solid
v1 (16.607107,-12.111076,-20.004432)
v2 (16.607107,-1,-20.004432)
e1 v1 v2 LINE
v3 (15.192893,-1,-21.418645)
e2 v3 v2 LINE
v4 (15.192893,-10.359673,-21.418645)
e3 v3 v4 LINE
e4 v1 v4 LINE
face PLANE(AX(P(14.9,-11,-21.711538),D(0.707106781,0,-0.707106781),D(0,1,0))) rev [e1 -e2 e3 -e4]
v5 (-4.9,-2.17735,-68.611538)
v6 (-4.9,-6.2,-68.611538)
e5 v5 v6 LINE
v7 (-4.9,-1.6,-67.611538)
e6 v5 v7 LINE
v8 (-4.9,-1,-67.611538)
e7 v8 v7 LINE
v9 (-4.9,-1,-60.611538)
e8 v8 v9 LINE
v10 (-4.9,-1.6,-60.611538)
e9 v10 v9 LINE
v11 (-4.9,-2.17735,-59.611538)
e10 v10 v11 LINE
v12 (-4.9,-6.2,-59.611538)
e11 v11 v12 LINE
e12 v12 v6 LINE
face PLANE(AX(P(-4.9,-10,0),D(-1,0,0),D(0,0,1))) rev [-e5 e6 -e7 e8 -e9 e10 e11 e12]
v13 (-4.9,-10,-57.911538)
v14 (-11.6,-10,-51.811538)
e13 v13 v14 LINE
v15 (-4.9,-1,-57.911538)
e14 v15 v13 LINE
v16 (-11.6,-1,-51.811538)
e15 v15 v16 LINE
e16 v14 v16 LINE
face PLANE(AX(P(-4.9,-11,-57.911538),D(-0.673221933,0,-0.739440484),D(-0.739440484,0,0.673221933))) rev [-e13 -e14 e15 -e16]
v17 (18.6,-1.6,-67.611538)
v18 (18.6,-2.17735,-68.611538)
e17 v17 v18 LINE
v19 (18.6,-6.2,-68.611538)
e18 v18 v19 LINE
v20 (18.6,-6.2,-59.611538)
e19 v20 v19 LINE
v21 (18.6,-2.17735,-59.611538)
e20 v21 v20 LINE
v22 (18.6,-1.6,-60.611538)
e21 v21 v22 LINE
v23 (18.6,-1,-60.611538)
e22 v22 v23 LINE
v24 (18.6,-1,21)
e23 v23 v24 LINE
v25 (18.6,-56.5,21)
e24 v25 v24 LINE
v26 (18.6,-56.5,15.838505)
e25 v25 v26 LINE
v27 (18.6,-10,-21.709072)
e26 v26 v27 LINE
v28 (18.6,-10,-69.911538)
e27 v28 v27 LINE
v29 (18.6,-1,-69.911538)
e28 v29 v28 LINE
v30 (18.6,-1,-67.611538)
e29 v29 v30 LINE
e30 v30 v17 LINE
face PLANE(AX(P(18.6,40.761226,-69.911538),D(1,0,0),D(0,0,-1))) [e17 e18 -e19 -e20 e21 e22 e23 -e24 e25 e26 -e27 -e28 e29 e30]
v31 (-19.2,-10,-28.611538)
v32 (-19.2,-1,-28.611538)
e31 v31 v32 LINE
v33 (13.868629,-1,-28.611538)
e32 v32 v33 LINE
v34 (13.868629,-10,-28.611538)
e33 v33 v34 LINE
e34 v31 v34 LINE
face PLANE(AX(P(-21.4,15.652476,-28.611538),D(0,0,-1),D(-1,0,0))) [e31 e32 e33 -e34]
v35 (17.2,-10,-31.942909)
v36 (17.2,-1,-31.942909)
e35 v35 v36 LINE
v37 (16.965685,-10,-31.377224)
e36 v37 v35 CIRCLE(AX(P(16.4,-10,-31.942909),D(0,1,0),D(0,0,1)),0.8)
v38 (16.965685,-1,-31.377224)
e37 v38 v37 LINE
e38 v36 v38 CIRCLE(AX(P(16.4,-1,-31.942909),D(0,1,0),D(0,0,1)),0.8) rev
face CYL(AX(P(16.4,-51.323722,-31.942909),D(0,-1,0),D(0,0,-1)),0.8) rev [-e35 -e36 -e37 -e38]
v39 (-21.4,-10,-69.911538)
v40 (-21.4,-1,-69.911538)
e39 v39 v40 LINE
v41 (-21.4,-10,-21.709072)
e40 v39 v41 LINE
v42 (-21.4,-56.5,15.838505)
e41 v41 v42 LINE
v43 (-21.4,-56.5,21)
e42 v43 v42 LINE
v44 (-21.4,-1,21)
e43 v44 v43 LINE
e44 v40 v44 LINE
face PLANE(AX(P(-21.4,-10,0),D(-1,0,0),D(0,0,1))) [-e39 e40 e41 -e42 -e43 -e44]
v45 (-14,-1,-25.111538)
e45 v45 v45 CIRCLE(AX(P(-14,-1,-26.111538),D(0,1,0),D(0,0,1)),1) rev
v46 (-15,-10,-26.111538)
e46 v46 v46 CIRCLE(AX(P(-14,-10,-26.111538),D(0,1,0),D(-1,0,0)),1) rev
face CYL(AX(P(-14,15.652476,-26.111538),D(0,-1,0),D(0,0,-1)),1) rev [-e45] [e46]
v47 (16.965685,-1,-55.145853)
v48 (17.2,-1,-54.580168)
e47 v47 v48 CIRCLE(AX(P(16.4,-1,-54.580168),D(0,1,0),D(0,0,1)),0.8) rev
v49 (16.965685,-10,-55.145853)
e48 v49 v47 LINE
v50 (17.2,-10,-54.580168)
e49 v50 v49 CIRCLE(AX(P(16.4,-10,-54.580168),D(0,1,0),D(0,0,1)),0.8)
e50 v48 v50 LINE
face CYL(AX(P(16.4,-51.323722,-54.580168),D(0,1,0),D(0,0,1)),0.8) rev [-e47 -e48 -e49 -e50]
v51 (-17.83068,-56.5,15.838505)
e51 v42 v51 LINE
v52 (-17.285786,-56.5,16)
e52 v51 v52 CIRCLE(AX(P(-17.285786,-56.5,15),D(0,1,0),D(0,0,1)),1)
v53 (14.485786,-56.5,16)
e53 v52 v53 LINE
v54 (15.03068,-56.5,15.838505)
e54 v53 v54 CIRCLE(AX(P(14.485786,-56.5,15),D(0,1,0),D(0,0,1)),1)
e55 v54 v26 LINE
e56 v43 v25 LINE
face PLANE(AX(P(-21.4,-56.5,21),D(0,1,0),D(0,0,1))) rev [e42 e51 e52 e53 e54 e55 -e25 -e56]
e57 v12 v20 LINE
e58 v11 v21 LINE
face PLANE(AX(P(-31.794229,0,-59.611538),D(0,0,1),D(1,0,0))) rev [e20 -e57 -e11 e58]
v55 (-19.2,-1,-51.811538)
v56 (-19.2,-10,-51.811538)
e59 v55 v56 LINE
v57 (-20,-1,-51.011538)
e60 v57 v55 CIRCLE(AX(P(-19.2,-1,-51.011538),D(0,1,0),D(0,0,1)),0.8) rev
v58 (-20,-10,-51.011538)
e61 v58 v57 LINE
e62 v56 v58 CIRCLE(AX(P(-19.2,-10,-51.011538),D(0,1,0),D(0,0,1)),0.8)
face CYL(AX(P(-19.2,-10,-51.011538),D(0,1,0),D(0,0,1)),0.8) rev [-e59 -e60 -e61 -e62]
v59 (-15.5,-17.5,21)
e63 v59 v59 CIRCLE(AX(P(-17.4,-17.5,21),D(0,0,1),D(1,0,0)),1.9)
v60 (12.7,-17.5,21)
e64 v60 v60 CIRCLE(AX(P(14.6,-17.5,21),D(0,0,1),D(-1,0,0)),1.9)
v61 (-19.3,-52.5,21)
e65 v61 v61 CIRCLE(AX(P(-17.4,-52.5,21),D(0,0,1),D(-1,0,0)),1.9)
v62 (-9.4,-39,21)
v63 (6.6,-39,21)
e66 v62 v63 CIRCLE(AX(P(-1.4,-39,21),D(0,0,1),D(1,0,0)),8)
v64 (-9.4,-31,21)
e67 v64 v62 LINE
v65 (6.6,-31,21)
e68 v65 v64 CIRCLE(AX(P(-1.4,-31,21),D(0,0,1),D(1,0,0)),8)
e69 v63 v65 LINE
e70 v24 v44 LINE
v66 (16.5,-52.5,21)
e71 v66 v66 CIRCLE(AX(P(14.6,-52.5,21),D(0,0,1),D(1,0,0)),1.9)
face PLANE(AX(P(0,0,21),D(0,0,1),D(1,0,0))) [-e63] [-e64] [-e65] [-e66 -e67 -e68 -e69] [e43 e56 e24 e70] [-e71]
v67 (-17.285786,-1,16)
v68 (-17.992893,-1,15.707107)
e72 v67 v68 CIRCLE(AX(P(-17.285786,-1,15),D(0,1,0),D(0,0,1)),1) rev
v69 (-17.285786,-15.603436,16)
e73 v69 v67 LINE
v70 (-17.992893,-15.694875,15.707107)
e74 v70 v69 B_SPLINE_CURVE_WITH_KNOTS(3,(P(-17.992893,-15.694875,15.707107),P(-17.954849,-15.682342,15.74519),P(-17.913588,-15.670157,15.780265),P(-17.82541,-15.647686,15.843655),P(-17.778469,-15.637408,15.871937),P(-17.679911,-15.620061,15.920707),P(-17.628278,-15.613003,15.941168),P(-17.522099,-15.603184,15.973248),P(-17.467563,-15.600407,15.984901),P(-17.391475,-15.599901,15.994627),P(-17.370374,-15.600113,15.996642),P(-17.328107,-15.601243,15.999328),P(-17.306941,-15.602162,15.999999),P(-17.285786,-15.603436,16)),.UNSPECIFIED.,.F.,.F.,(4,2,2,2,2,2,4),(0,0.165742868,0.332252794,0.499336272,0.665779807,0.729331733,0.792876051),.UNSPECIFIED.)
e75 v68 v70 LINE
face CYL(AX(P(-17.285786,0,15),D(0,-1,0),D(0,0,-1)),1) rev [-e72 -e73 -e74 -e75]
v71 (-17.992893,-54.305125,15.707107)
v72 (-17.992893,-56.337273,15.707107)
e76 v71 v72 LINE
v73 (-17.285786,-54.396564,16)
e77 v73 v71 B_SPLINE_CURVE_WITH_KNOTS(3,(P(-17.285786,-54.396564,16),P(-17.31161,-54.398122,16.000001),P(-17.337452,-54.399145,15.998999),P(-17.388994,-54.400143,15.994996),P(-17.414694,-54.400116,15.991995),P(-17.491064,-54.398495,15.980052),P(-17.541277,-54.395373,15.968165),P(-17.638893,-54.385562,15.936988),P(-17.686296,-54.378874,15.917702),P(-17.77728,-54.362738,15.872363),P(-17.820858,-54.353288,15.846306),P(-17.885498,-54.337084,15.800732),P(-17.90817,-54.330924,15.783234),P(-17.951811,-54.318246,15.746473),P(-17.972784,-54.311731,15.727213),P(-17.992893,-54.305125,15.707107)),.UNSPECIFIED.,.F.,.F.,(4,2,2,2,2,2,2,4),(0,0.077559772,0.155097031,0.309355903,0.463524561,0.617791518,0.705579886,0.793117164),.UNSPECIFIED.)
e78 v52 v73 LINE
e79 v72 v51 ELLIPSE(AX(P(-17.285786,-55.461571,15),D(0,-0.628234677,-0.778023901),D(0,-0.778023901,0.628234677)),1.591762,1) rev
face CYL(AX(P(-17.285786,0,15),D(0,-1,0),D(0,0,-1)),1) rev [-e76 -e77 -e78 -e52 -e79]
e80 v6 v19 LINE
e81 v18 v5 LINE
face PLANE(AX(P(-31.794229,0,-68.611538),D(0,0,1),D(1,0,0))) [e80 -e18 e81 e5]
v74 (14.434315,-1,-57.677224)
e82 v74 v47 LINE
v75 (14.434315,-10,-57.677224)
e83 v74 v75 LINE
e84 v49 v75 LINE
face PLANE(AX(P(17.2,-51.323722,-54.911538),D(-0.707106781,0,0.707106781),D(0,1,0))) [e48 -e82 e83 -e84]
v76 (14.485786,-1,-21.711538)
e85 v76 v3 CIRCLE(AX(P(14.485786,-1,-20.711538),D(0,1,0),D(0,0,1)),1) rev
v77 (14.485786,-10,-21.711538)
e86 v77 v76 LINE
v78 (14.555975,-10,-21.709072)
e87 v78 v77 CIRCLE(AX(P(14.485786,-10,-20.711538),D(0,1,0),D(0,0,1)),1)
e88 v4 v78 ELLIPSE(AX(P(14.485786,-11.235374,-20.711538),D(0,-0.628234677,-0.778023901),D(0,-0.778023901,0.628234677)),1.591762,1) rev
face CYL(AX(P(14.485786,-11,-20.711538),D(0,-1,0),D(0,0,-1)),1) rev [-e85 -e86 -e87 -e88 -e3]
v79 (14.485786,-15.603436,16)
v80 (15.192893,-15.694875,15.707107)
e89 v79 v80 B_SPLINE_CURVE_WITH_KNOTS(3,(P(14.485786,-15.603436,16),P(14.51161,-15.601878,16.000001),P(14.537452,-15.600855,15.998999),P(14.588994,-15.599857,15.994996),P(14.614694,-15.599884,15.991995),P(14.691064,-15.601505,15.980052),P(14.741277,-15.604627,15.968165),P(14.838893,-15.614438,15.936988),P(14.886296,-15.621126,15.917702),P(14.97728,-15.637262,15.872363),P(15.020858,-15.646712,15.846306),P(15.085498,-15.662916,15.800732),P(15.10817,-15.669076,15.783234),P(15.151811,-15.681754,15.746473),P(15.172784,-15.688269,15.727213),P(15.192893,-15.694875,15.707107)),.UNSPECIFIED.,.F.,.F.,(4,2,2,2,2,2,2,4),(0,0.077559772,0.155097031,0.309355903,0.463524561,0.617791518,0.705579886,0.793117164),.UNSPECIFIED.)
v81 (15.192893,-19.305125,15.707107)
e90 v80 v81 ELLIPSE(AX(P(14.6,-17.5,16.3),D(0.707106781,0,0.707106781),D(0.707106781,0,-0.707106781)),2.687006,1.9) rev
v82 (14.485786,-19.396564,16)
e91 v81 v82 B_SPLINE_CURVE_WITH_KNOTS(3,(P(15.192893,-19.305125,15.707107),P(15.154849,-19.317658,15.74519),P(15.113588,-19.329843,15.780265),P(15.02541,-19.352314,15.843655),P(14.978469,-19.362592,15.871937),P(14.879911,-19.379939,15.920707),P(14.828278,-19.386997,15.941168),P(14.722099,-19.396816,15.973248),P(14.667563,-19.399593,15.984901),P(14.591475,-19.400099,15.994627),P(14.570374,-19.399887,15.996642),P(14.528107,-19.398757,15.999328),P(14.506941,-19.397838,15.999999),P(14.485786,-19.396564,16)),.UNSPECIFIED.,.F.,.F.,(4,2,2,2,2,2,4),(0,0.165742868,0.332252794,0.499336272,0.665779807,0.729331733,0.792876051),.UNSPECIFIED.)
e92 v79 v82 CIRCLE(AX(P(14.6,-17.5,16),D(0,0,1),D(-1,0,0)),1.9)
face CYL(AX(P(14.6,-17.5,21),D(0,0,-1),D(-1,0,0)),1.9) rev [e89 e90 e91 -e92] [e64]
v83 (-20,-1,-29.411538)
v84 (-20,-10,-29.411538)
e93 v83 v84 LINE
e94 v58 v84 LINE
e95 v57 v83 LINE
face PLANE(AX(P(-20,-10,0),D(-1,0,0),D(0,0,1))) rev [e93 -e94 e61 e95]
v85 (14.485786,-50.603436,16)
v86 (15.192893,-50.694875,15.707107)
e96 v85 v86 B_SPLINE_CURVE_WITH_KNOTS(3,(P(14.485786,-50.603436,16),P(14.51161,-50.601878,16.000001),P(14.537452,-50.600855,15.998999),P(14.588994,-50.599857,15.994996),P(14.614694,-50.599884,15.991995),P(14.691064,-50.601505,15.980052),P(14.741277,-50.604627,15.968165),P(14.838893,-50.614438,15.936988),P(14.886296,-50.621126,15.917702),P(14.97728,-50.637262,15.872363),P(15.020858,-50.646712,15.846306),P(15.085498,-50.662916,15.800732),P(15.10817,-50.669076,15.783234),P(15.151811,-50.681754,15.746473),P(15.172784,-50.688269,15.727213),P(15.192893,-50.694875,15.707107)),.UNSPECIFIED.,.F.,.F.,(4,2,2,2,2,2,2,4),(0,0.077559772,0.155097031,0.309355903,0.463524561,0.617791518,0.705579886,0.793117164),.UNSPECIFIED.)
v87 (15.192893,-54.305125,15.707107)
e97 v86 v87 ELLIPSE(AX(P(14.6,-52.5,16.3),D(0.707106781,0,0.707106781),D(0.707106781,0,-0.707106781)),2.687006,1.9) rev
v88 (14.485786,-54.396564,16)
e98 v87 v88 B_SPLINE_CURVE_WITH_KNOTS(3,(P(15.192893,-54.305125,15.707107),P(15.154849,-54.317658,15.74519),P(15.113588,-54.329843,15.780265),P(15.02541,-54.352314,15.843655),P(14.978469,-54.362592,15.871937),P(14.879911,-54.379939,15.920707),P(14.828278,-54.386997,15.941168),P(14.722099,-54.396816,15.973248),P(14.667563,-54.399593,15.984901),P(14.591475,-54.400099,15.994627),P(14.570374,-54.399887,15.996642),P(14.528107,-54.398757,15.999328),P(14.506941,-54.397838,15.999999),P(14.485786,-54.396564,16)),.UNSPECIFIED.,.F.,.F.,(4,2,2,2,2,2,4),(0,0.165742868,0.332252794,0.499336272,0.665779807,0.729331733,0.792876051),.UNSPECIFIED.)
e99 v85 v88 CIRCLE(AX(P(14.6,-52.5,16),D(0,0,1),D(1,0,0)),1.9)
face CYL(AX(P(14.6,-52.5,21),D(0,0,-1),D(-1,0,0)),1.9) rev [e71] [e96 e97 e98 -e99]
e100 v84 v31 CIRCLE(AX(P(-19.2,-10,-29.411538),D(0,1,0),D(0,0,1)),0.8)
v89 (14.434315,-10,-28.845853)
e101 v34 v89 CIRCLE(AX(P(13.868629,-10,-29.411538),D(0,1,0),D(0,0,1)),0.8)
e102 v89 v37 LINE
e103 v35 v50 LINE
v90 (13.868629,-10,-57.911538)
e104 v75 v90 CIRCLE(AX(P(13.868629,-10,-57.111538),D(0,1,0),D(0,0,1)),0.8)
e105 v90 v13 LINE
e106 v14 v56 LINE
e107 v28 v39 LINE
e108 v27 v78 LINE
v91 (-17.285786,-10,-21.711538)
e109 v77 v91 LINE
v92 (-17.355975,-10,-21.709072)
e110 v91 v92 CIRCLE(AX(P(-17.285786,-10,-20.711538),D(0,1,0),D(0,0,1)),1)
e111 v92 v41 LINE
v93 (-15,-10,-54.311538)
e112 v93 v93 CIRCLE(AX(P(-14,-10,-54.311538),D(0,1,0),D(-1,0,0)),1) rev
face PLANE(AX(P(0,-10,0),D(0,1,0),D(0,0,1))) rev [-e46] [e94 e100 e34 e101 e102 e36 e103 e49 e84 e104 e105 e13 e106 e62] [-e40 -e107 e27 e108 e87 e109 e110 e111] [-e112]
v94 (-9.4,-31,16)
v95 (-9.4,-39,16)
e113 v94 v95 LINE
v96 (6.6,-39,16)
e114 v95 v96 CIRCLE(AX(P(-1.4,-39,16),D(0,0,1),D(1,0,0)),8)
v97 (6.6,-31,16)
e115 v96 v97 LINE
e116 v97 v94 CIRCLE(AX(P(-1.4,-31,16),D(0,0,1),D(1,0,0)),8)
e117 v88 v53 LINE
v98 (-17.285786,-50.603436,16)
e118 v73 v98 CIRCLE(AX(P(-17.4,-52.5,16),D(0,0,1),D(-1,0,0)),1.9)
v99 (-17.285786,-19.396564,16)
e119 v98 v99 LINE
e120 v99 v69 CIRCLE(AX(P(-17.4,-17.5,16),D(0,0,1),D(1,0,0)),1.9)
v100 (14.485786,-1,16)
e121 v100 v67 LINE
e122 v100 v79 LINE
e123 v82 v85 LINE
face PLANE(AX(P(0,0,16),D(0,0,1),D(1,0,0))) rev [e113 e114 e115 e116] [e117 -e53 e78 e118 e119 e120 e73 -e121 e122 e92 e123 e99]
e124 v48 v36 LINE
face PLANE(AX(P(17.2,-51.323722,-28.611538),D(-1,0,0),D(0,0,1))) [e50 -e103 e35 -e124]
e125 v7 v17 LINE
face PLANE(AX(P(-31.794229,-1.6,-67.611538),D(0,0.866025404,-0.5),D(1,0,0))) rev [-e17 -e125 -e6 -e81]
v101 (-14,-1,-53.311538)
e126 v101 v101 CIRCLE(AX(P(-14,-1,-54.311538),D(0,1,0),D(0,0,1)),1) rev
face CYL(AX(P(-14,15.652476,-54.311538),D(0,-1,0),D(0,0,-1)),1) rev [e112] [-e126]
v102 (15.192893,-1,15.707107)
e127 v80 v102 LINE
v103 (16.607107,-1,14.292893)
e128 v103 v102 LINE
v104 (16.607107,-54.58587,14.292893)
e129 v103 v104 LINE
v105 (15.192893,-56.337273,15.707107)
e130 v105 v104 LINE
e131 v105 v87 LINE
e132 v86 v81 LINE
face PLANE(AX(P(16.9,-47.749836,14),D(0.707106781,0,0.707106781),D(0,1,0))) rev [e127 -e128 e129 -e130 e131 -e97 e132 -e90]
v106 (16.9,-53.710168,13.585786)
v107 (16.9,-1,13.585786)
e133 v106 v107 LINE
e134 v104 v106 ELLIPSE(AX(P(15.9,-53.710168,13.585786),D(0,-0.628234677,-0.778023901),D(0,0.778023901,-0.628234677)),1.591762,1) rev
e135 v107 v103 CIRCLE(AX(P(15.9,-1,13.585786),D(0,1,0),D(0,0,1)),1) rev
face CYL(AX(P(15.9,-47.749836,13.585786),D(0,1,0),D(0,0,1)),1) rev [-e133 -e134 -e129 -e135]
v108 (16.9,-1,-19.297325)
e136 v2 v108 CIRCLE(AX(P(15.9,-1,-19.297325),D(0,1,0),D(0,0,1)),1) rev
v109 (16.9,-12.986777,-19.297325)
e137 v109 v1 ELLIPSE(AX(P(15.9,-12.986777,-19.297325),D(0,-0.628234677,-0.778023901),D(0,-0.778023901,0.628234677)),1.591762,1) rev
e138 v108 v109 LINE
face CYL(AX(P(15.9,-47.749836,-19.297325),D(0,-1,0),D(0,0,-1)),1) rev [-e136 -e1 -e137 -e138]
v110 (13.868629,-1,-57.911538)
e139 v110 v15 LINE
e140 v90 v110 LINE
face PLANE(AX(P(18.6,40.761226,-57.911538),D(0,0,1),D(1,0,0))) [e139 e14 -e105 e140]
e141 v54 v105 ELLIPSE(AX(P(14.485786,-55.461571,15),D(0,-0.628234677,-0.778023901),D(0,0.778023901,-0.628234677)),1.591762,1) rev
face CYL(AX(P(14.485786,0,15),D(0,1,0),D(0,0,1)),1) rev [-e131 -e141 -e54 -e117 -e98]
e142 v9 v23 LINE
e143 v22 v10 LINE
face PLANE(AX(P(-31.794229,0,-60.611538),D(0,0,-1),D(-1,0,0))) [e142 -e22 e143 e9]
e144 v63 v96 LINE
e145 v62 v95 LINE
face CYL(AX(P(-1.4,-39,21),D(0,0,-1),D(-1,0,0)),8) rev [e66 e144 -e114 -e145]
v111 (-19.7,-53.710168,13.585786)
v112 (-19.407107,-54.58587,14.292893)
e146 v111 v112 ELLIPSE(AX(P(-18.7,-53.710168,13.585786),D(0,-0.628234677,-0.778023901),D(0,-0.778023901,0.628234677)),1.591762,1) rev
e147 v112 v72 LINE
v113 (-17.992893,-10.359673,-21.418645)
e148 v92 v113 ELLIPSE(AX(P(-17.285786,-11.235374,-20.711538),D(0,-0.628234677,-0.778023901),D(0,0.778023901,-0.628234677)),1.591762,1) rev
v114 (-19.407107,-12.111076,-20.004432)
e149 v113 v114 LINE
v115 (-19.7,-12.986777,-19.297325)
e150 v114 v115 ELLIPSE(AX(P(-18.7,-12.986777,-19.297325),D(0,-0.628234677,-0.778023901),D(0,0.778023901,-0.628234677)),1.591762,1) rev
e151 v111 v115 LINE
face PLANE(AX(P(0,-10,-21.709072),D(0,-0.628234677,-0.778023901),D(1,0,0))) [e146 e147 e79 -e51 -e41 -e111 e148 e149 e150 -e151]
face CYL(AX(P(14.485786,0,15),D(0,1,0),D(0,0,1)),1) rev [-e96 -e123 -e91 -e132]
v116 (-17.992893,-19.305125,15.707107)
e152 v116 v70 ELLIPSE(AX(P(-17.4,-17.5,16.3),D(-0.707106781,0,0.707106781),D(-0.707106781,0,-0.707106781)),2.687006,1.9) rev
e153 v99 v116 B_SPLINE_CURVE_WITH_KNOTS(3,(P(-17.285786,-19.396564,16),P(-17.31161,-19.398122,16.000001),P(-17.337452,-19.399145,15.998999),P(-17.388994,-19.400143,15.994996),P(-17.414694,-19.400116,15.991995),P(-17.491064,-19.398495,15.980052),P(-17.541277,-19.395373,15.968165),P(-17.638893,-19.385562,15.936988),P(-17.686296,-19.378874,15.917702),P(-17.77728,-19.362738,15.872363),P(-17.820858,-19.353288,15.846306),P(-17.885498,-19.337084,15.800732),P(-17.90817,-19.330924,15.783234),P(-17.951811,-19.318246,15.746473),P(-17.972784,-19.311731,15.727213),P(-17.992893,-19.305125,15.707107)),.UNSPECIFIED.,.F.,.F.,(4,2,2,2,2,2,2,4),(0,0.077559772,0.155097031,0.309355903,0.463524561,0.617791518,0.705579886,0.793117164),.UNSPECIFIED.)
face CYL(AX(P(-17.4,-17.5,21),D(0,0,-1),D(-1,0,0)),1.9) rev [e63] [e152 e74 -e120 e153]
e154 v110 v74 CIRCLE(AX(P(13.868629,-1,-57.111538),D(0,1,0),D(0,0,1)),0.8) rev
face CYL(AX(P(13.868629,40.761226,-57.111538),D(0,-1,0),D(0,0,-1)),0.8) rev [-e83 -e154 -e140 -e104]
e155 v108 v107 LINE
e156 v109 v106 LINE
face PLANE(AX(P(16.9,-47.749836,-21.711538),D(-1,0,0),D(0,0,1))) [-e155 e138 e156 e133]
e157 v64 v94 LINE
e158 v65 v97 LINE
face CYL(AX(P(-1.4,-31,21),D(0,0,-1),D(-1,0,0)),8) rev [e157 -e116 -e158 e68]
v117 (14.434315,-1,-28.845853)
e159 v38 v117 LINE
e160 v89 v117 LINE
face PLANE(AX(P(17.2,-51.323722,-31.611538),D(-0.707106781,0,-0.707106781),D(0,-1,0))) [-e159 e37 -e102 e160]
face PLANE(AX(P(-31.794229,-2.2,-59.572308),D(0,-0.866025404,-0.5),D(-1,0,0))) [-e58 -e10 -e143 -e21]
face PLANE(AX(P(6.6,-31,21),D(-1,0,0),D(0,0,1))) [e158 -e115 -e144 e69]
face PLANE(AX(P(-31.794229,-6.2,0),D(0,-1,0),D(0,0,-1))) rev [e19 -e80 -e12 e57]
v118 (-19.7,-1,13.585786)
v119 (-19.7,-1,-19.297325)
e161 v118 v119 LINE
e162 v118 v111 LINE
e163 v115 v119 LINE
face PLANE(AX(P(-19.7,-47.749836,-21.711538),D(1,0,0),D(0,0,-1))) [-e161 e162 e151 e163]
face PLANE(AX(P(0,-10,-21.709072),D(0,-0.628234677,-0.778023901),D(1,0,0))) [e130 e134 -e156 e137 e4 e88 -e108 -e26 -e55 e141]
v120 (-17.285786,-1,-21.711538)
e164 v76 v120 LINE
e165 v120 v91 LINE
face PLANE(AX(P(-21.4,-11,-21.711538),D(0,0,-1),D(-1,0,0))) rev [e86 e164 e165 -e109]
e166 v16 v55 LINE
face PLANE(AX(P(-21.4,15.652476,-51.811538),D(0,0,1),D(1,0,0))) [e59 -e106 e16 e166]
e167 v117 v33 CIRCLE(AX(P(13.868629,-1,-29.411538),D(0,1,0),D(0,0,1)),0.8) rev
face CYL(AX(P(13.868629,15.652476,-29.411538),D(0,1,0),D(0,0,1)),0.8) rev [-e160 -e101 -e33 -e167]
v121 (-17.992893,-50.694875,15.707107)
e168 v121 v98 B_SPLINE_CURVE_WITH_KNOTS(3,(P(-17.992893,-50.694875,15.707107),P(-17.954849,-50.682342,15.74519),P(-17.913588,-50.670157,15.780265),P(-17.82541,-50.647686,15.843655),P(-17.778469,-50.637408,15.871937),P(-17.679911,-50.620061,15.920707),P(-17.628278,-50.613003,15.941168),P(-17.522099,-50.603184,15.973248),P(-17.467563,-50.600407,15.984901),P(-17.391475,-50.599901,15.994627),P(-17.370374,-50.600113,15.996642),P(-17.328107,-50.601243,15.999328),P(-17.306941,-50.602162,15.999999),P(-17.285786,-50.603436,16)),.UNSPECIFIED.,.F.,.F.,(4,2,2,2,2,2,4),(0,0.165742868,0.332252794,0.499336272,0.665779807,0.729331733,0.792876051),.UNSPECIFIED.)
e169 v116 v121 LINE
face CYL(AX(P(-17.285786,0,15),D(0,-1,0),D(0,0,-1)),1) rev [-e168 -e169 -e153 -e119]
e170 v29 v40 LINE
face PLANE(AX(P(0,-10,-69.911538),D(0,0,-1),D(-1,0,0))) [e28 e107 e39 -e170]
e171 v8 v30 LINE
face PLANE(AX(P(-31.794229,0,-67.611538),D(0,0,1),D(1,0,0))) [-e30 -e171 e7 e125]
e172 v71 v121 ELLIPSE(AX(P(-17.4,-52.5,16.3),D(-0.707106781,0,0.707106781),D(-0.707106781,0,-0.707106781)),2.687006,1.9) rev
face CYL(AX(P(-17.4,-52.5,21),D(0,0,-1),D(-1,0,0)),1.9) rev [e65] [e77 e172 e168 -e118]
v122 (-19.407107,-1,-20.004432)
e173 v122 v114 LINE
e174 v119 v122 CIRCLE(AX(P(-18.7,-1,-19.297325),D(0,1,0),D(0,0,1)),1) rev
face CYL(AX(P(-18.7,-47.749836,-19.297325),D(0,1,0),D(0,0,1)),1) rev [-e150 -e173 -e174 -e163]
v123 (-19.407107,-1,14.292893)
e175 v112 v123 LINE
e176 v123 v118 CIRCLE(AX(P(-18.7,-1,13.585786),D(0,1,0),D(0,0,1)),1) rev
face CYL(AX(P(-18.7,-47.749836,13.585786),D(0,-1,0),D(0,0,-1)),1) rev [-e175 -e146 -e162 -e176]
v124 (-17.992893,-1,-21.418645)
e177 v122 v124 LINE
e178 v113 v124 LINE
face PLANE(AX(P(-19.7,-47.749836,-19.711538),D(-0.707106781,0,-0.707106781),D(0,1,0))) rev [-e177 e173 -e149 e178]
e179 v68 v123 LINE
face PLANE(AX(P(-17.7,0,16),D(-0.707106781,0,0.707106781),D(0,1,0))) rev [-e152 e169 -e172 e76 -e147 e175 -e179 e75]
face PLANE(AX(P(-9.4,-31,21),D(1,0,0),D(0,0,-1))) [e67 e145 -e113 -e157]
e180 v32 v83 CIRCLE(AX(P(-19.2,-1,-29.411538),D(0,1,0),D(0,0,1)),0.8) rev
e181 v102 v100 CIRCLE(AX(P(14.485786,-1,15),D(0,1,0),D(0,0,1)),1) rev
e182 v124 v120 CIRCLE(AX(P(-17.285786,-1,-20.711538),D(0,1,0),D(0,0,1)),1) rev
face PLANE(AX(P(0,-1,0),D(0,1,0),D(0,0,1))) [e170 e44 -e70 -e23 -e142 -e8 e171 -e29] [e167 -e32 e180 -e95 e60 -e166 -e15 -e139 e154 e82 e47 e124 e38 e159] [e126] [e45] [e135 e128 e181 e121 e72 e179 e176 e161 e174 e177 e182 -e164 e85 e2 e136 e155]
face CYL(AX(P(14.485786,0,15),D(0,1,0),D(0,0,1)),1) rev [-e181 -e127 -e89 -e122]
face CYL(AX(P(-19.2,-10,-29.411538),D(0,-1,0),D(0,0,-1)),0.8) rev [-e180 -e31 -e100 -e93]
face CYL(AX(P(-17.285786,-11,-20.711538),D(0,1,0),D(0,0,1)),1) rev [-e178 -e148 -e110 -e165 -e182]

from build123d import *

# Parameters (mm, degrees)
BOSS_EXTRUDE1_START      = -1
SKETCH1_W                = 1.4
SKETCH1_H                = 89.2
BOSS_EXTRUDE1_DEPTH      = 9
SKETCH4_W                = 40
SKETCH4_H                = 12
BOSS_EXTRUDE3_DEPTH      = 9
SERVO_HOLDER_DEPTH       = 1
SERVO_HOLDER_DEPTH_BACK  = 9
SKETCH3_W                = 14
SKETCH3_H                = 7
SKETCH3_R                = 1
SKETCH37_W               = 26
SKETCH37_H               = 7
BOSS_EXTRUDE19_DEPTH     = 10
CUT_EXTRUDE10_DEPTH      = 93.388310949
CUT_EXTRUDE10_DEPTH_BACK = 93.388310949
SKETCH29_W               = 48.801454262
SKETCH29_H               = 6.177389624
BOSS_EXTRUDE17_DEPTH     = 3
SKETCH39_W               = 1.4
SKETCH39_H               = 41.3
BOSS_EXTRUDE20_DEPTH     = 9
CUT_EXTRUDE13_DEPTH      = 23.5
CHAMFER2_SIZE            = 0.6
CHAMFER2_SIZE_2          = 1.039230485
CHAMFER3_SIZE            = 3
CHAMFER4_SIZE            = 2.5
CUT_EXTRUDE16_DEPTH      = 10
FILLET11_R               = 0.8
SKETCH51_W               = 40
SKETCH51_H               = 41
CUT_EXTRUDE17_DEPTH      = 10
SKETCH50_W               = 40
SKETCH50_H               = 55.5
SKETCH50_R               = 1.9
BOSS_EXTRUDE24_DEPTH     = 5
SKETCH53_W               = 1.7
SKETCH53_H               = 37.711538462
BOSS_EXTRUDE25_DEPTH     = 9
CHAMFER6_SIZE            = 37.709072194
CHAMFER6_SIZE_2          = 46.7
CHAMFER5_SIZE            = 2
FILLET13_R               = 1


with BuildPart() as part:
    # Sketch1 → Boss-Extrude1 (new body)
    with BuildSketch(Plane(origin=(0, 0, 0), x_dir=(1, 0, 0), z_dir=(0, 1, 0)).offset(BOSS_EXTRUDE1_START)):
        with Locations((-20.7, 25.311538462)):
            Rectangle(SKETCH1_W, SKETCH1_H)
    extrude(amount=-BOSS_EXTRUDE1_DEPTH)

    # Sketch4 → Boss-Extrude3 (add)
    with BuildSketch(Plane.XZ.offset(10)):
        with Locations((-1.4, -63.911538462)):
            Rectangle(SKETCH4_W, SKETCH4_H)
    extrude(amount=-BOSS_EXTRUDE3_DEPTH)

    # Sketch3 → Servo Holder (add, two sides: drawn at the far end of the back side and taken through both)
    # profile 1 of 2: a face of its own
    with BuildSketch(Plane.XZ.offset(10).offset(-SERVO_HOLDER_DEPTH_BACK)):
        with Locations((-14.4, -55.311538462)):
            Rectangle(SKETCH3_W, SKETCH3_H)
        with Locations(Location((-14, -54.311538462, 0), (0, 0, 270))):
            Circle(SKETCH3_R, mode=Mode.SUBTRACT)
    # profile 2 of 2: a face of its own
    with BuildSketch(Plane.XZ.offset(10).offset(-SERVO_HOLDER_DEPTH_BACK)):
        with Locations((-14.4, -25.111538462)):
            Rectangle(SKETCH3_W, SKETCH3_H)
        with Locations(Location((-14, -26.111538462, 0), (0, 0, 90))):
            Circle(SKETCH3_R, mode=Mode.SUBTRACT)
    extrude(amount=SERVO_HOLDER_DEPTH + SERVO_HOLDER_DEPTH_BACK)

    # Sketch37 → Boss-Extrude19 (add)
    with BuildSketch(Plane(origin=(0, -1, 0), x_dir=(1, 0, 0), z_dir=(0, 1, 0))):
        with Locations((5.6, 25.111538462)):
            Rectangle(SKETCH37_W, SKETCH37_H)
    extrude(amount=-BOSS_EXTRUDE19_DEPTH)

    # Sketch29 → Cut-Extrude10 (cut, two sides: drawn at the far end of the back side and taken through both)
    with BuildSketch(Plane(origin=(0, 0, -69.911538462), x_dir=(-1, 0, 0), z_dir=(0, 0, -1)).offset(-CUT_EXTRUDE10_DEPTH_BACK)):
        with Locations((-3.000727131, -13.088694812)):
            Rectangle(SKETCH29_W, SKETCH29_H)
    extrude(amount=CUT_EXTRUDE10_DEPTH + CUT_EXTRUDE10_DEPTH_BACK, mode=Mode.SUBTRACT)

    # Sketch35 → Boss-Extrude17 (add)
    with BuildSketch(Plane(origin=(18.6, 0, 0), x_dir=(0, 0, -1), z_dir=(1, 0, 0))):
        Polygon((-2, -1), (21.611538462, -1), (21.611538462, -10), (-19.288461538, -10), (-19.288461538, -1), align=None)
    extrude(amount=-BOSS_EXTRUDE17_DEPTH)

    # Sketch39 → Boss-Extrude20 (add)
    with BuildSketch(Plane(origin=(0, -1, 0), x_dir=(1, 0, 0), z_dir=(0, 1, 0))):
        with Locations((17.9, 49.261538462)):
            Rectangle(SKETCH39_W, SKETCH39_H)
    extrude(amount=-BOSS_EXTRUDE20_DEPTH)

    # Sketch40 → Cut-Extrude13 (cut)
    with BuildSketch(Plane(origin=(18.6, 0, 0), x_dir=(0, 0, -1), z_dir=(1, 0, 0))):
        Polygon((64.111538462, -1), (60.611538462, -1), (60.611538462, -2.2), (59.611538462, -2.2), (59.611538462, -6.2), (64.111538462, -6.2), align=None)
        Polygon((67.611538462, -1), (64.111538462, -1), (64.111538462, -6.2), (68.611538462, -6.2), (68.611538462, -2.2), (67.611538462, -2.2), align=None)
    extrude(amount=-CUT_EXTRUDE13_DEPTH, mode=Mode.SUBTRACT)

    # Chamfer2
    # the kernel refuses this chamfer: 1.039230485, 0.6 mm, written as the material it takes off along each edge
    with BuildSketch(Plane(origin=(21.288578382, -2.2, -60.611538462), x_dir=(0, 0.9983227437537925, -0.05789386240267317), z_dir=(-1, 0, 0))) as chamfer2_piece_1_section:
        Polygon((CHAMFER2_SIZE * 0.998322743754, -CHAMFER2_SIZE * 0.0578938624027), (-CHAMFER2_SIZE_2 * 0.0578938623771, -CHAMFER2_SIZE_2 * 0.998322743313), (0, 0), align=None)
    chamfer2_piece_1 = extrude(amount=26.188578382, mode=Mode.PRIVATE)
    chamfer2_piece_1 = split(chamfer2_piece_1, bisect_by=Plane(origin=(8.194289191, -2.005782009, -59.611538462), z_dir=(0, 0, -1)), keep=Keep.TOP, mode=Mode.PRIVATE)
    add(chamfer2_piece_1, mode=Mode.SUBTRACT)
    with BuildSketch(Plane(origin=(21.288578382, -2.2, -67.611538462), x_dir=(0, 0.9983227437537925, 0.05789386240267317), z_dir=(-1, 0, 0))) as chamfer2_piece_2_section:
        Polygon((CHAMFER2_SIZE * 0.998322743754, CHAMFER2_SIZE * 0.0578938624027), (-CHAMFER2_SIZE_2 * 0.0578938623771, CHAMFER2_SIZE_2 * 0.998322743313), (0, 0), align=None)
    chamfer2_piece_2 = extrude(amount=26.188578382, mode=Mode.PRIVATE)
    chamfer2_piece_2 = split(chamfer2_piece_2, bisect_by=Plane(origin=(8.194289191, -2.005782009, -68.611538462), z_dir=(0, 0, 1)), keep=Keep.TOP, mode=Mode.PRIVATE)
    add(chamfer2_piece_2, mode=Mode.SUBTRACT)

    # Chamfer3
    chamfer3_edges = [part.edges().sort_by_distance(p)[0] for p in [
        (17.2, -5.5, -57.911538462),
        (17.2, -5.5, -28.611538462),
    ]]
    chamfer(chamfer3_edges, length=CHAMFER3_SIZE)

    # Chamfer4
    chamfer4_edges = [part.edges().sort_by_distance(p)[0] for p in [
        (-7.4, -5.5, -57.911538462),
    ]]
    chamfer(chamfer4_edges, length=CHAMFER4_SIZE)

    # Sketch43 → Cut-Extrude16 (cut)
    with BuildSketch(Plane(origin=(0, -1, 0), x_dir=(1, 0, 0), z_dir=(0, 1, 0))):
        Polygon((-4.9, 57.911538462), (-11.6, 51.811538462), (-4.9, 51.811538462), align=None)
    extrude(amount=-CUT_EXTRUDE16_DEPTH, mode=Mode.SUBTRACT)

    # Fillet11
    fillet11_edges = [part.edges().sort_by_distance(p)[0] for p in [
        (17.2, -5.5, -54.911538462),
        (17.2, -5.5, -31.611538462),
        (14.2, -5.5, -28.611538462),
        (14.2, -5.5, -57.911538462),
        (-20, -5.5, -51.811538462),
        (-20, -5.5, -28.611538462),
    ]]
    fillet(fillet11_edges, radius=FILLET11_R)

    # Sketch51 → Cut-Extrude17 (cut)
    with BuildSketch(Plane(origin=(0, -1, 0), x_dir=(1, 0, 0), z_dir=(0, 1, 0))):
        with Locations((-1.4, 1.211538462)):
            Rectangle(SKETCH51_W, SKETCH51_H)
    extrude(amount=-CUT_EXTRUDE17_DEPTH, mode=Mode.SUBTRACT)



with BuildPart() as body_2:
    # Sketch50 → Boss-Extrude24 (new body)
    with BuildSketch(Plane.XY.offset(16)):
        with Locations((-1.4, -28.75)):
            Rectangle(SKETCH50_W, SKETCH50_H)
        with Locations((-17.4, -17.5)):
            Circle(SKETCH50_R, mode=Mode.SUBTRACT)
        with Locations(Location((14.6, -17.5, 0), (0, 0, 180))):
            Circle(SKETCH50_R, mode=Mode.SUBTRACT)
        with Locations((14.6, -52.5)):
            Circle(SKETCH50_R, mode=Mode.SUBTRACT)
        with Locations(Location((-17.4, -52.5, 0), (0, 0, 180))):
            Circle(SKETCH50_R, mode=Mode.SUBTRACT)
        with BuildLine():
            Line((6.6, -31), (6.6, -39))
            ThreePointArc((6.6, -39), (-1.4, -47), (-9.4, -39))
            Line((-9.4, -39), (-9.4, -31))
            ThreePointArc((-9.4, -31), (-1.4, -23), (6.6, -31))
        make_face(mode=Mode.SUBTRACT)
    extrude(amount=BOSS_EXTRUDE24_DEPTH)


with BuildPart() as part_1:
    add(part.part)

    add(body_2.part)  # Boss-Extrude25 merges body 2
    # Sketch53 → Boss-Extrude25 (add)
    with BuildSketch(Plane(origin=(0, -1, 0), x_dir=(1, 0, 0), z_dir=(0, 1, 0))):
        with Locations((17.75, 2.855769231)):
            Rectangle(SKETCH53_W, SKETCH53_H)
        with Locations((-20.55, 2.855769231)):
            Rectangle(SKETCH53_W, SKETCH53_H)
    extrude(amount=-BOSS_EXTRUDE25_DEPTH)

    # Chamfer6
    # the kernel refuses this chamfer: 46.7, 37.709072194 mm, written as the material it adds along each edge
    with BuildSketch(Plane(origin=(-103.519116723, -10, 16), x_dir=(0, 0.03735176981942527, -0.999302179168722), z_dir=(1, 0, 0))) as chamfer6_piece_1_section:
        Polygon((CHAMFER6_SIZE * 0.99930217918, -CHAMFER6_SIZE * 0.0373517698198), (-CHAMFER6_SIZE_2 * 0.0373517698194, -CHAMFER6_SIZE_2 * 0.999302179169), (0, 0), align=None)
    chamfer6_piece_1 = extrude(amount=242.538233446, mode=Mode.PRIVATE)
    chamfer6_piece_1 = split(chamfer6_piece_1, bisect_by=Plane(origin=(-20.55, -56.5, 3.430079709), z_dir=(0, 1, 0)), keep=Keep.TOP, mode=Mode.PRIVATE)
    chamfer6_piece_1 = split(chamfer6_piece_1, bisect_by=Plane(origin=(-19.7, -25.566098081, 3.430079709), z_dir=(-1, 0, 0)), keep=Keep.TOP, mode=Mode.PRIVATE)
    chamfer6_piece_1 = split(chamfer6_piece_1, bisect_by=Plane(origin=(-21.4, -25.566098081, 3.430079709), z_dir=(1, 0, 0)), keep=Keep.TOP, mode=Mode.PRIVATE)
    add(chamfer6_piece_1)
    with BuildSketch(Plane(origin=(16.9, -10, 16), x_dir=(0, 0.03735176981942527, -0.999302179168722), z_dir=(1, 0, 0))) as chamfer6_piece_2_section:
        Polygon((CHAMFER6_SIZE * 0.99930217918, -CHAMFER6_SIZE * 0.0373517698198), (-CHAMFER6_SIZE_2 * 0.0373517698194, -CHAMFER6_SIZE_2 * 0.999302179169), (0, 0), align=None)
    chamfer6_piece_2 = extrude(amount=1.7, mode=Mode.PRIVATE)
    chamfer6_piece_2 = split(chamfer6_piece_2, bisect_by=Plane(origin=(17.75, -56.5, 3.430079709), z_dir=(0, 1, 0)), keep=Keep.TOP, mode=Mode.PRIVATE)
    add(chamfer6_piece_2)
    with BuildSketch(Plane(origin=(100.719116723, -10, 16), x_dir=(0, 0.03735176981942527, -0.999302179168722), z_dir=(-1, 0, 0))) as chamfer6_piece_3_section:
        Polygon((CHAMFER6_SIZE * 0.99930217918, CHAMFER6_SIZE * 0.0373517698198), (-CHAMFER6_SIZE_2 * 0.0373517698194, CHAMFER6_SIZE_2 * 0.999302179169), (0, 0), align=None)
    chamfer6_piece_3 = extrude(amount=242.538233446, mode=Mode.PRIVATE)
    chamfer6_piece_3 = split(chamfer6_piece_3, bisect_by=Plane(origin=(17.75, -56.5, 3.430079709), z_dir=(0, 1, 0)), keep=Keep.TOP, mode=Mode.PRIVATE)
    chamfer6_piece_3 = split(chamfer6_piece_3, bisect_by=Plane(origin=(18.6, -25.566098081, 3.430079709), z_dir=(-1, 0, 0)), keep=Keep.TOP, mode=Mode.PRIVATE)
    chamfer6_piece_3 = split(chamfer6_piece_3, bisect_by=Plane(origin=(16.9, -25.566098081, 3.430079709), z_dir=(1, 0, 0)), keep=Keep.TOP, mode=Mode.PRIVATE)
    add(chamfer6_piece_3)
    with BuildSketch(Plane(origin=(-19.7, -10, 16), x_dir=(0, 0.03735176981942527, -0.999302179168722), z_dir=(-1, 0, 0))) as chamfer6_piece_4_section:
        Polygon((CHAMFER6_SIZE * 0.99930217918, CHAMFER6_SIZE * 0.0373517698198), (-CHAMFER6_SIZE_2 * 0.0373517698194, CHAMFER6_SIZE_2 * 0.999302179169), (0, 0), align=None)
    chamfer6_piece_4 = extrude(amount=1.7, mode=Mode.PRIVATE)
    chamfer6_piece_4 = split(chamfer6_piece_4, bisect_by=Plane(origin=(-20.55, -56.5, 3.430079709), z_dir=(0, 1, 0)), keep=Keep.TOP, mode=Mode.PRIVATE)
    add(chamfer6_piece_4)

    # Chamfer5
    # the kernel refuses this chamfer: 2 mm, written as the material it adds along each edge
    with BuildSketch(Plane(origin=(16.9, -56.5, 16), x_dir=(-0.9996219169115486, 9.398995055906874e-15, 0.027495876601428135), z_dir=(0, 1, 0))) as chamfer5_piece_1_section:
        Polygon((CHAMFER5_SIZE * 0.999621916911, -CHAMFER5_SIZE * 0.0274958766107), (-CHAMFER5_SIZE * 0.0274958766014, -CHAMFER5_SIZE * 0.999621916912), (0, 0), align=None)
    chamfer5_piece_1 = extrude(amount=55.5, mode=Mode.PRIVATE)
    chamfer5_piece_1 = chamfer5_piece_1 - Plane(origin=(14.6, -52.5, 15.332756943), x_dir=(1, 0, 0), z_dir=(0, 0, -1)) * Cylinder(1.9, 119, mode=Mode.PRIVATE)
    chamfer5_piece_1 = chamfer5_piece_1 - Plane(origin=(14.6, -17.5, 15.332756943), x_dir=(-1, 0, 0), z_dir=(0, 0, -1)) * Cylinder(1.9, 119, mode=Mode.PRIVATE)
    chamfer5_piece_1 = split(chamfer5_piece_1, bisect_by=Plane(origin=(16.262747453, -39.032256487, 1.733742705), z_dir=(0, 0.6282346774929722, 0.7780239006581362)), keep=Keep.TOP, mode=Mode.PRIVATE)
    add(chamfer5_piece_1)
    with BuildSketch(Plane(origin=(-19.7, -1, 16), x_dir=(0.9996219169112968, 9.144800521055879e-15, 0.027495876610585647), z_dir=(0, -1, 0))) as chamfer5_piece_2_section:
        Polygon((CHAMFER5_SIZE * 0.999621916911, -CHAMFER5_SIZE * 0.0274958766106), (-CHAMFER5_SIZE * 0.0274958766106, -CHAMFER5_SIZE * 0.999621916911), (0, 0), align=None)
    chamfer5_piece_2 = extrude(amount=55.5, mode=Mode.PRIVATE)
    chamfer5_piece_2 = split(chamfer5_piece_2, bisect_by=Plane(origin=(-19.062747543, -39.032254695, 1.733741258), z_dir=(0, 0.6282346774929722, 0.7780239006581362)), keep=Keep.TOP, mode=Mode.PRIVATE)
    chamfer5_piece_2 = chamfer5_piece_2 - Plane(origin=(-17.4, -52.5, 15.332756844), x_dir=(-1, 0, 0), z_dir=(0, 0, -1)) * Cylinder(1.9, 119, mode=Mode.PRIVATE)
    chamfer5_piece_2 = chamfer5_piece_2 - Plane(origin=(-17.4, -17.5, 15.332756844), x_dir=(1, 0, 0), z_dir=(0, 0, -1)) * Cylinder(1.9, 119, mode=Mode.PRIVATE)
    add(chamfer5_piece_2)
    with BuildSketch(Plane(origin=(16.9, -1, -21.711538462), x_dir=(-0.9996219169112968, 0, -0.027495876610585623), z_dir=(0, -1, 0))) as chamfer5_piece_3_section:
        Polygon((CHAMFER5_SIZE * 0.999621916911, -CHAMFER5_SIZE * 0.0274958766106), (-CHAMFER5_SIZE * 0.0274958766106, -CHAMFER5_SIZE * 0.999621916911), (0, 0), align=None)
    chamfer5_piece_3 = extrude(amount=9, mode=Mode.PRIVATE)
    chamfer5_piece_3 = split(chamfer5_piece_3, bisect_by=Plane(origin=(16.240555147, -7.596785669, -23.649607156), z_dir=(0, 0.6282346774929722, 0.7780239006581362)), keep=Keep.TOP, mode=Mode.PRIVATE)
    add(chamfer5_piece_3)
    with BuildSketch(Plane(origin=(16.9, -1, -21.711538462), x_dir=(-0.9996219169112968, 0, -0.027495876610585623), z_dir=(0, -1, 0))) as chamfer5_piece_4_section:
        Polygon((CHAMFER5_SIZE * 0.999621916911, -CHAMFER5_SIZE * 0.0274958766106), (-CHAMFER5_SIZE * 0.0274958766106, -CHAMFER5_SIZE * 0.999621916911), (0, 0), align=None)
    chamfer5_piece_4 = extrude(amount=14.143365976, mode=Mode.PRIVATE)
    chamfer5_piece_4 = split(chamfer5_piece_4, bisect_by=Plane(origin=(16.445051709, -10, -20.667722812), z_dir=(0, -1, 0)), keep=Keep.TOP, mode=Mode.PRIVATE)
    chamfer5_piece_4 = split(chamfer5_piece_4, bisect_by=Plane(origin=(16.445051709, -10.899314724, -20.982898236), z_dir=(0, 0.6282346774929722, 0.7780239006581362)), keep=Keep.TOP, mode=Mode.PRIVATE)
    add(chamfer5_piece_4)
    with BuildSketch(Plane(origin=(16.9, -1, -21.711538462), x_dir=(-0.9996219169112968, 0, -0.027495876610585623), z_dir=(0, -1, 0))) as chamfer5_piece_5_section:
        Polygon((CHAMFER5_SIZE * 0.999621916911, -CHAMFER5_SIZE * 0.0274958766106), (-CHAMFER5_SIZE * 0.0274958766106, -CHAMFER5_SIZE * 0.999621916911), (0, 0), align=None)
    chamfer5_piece_5 = extrude(amount=9, mode=Mode.PRIVATE)
    chamfer5_piece_5 = split(chamfer5_piece_5, bisect_by=Plane(origin=(15.504496117, -9.96219574, -21.739598181), z_dir=(0, -0.6282346774929722, -0.7780239006581362)), keep=Keep.TOP, mode=Mode.PRIVATE)
    add(chamfer5_piece_5)
    with BuildSketch(Plane(origin=(-19.7, -1, -21.711538462), x_dir=(0.9996219169112968, 0, -0.0274958766105856), z_dir=(0, -1, 0))) as chamfer5_piece_6_section:
        Polygon((CHAMFER5_SIZE * 0.999621916911, CHAMFER5_SIZE * 0.0274958766106), (-CHAMFER5_SIZE * 0.0274958766106, CHAMFER5_SIZE * 0.999621916911), (0, 0), align=None)
    chamfer5_piece_6 = extrude(amount=9, mode=Mode.PRIVATE)
    chamfer5_piece_6 = split(chamfer5_piece_6, bisect_by=Plane(origin=(-19.040555147, -7.596785669, -23.649607156), z_dir=(0, 0.6282346774929722, 0.7780239006581362)), keep=Keep.TOP, mode=Mode.PRIVATE)
    add(chamfer5_piece_6)
    with BuildSketch(Plane(origin=(-19.7, -1, -21.711538462), x_dir=(0.9996219169112968, 0, -0.0274958766105856), z_dir=(0, -1, 0))) as chamfer5_piece_7_section:
        Polygon((CHAMFER5_SIZE * 0.999621916911, CHAMFER5_SIZE * 0.0274958766106), (-CHAMFER5_SIZE * 0.0274958766106, CHAMFER5_SIZE * 0.999621916911), (0, 0), align=None)
    chamfer5_piece_7 = extrude(amount=14.143365976, mode=Mode.PRIVATE)
    chamfer5_piece_7 = split(chamfer5_piece_7, bisect_by=Plane(origin=(-19.245051709, -10.899314724, -20.982898236), z_dir=(0, 0.6282346774929722, 0.7780239006581362)), keep=Keep.TOP, mode=Mode.PRIVATE)
    chamfer5_piece_7 = split(chamfer5_piece_7, bisect_by=Plane(origin=(-19.245051709, -10, -20.667722812), z_dir=(0, -1, 0)), keep=Keep.TOP, mode=Mode.PRIVATE)
    add(chamfer5_piece_7)
    with BuildSketch(Plane(origin=(-19.7, -1, -21.711538462), x_dir=(0.9996219169112968, 0, -0.0274958766105856), z_dir=(0, -1, 0))) as chamfer5_piece_8_section:
        Polygon((CHAMFER5_SIZE * 0.999621916911, CHAMFER5_SIZE * 0.0274958766106), (-CHAMFER5_SIZE * 0.0274958766106, CHAMFER5_SIZE * 0.999621916911), (0, 0), align=None)
    chamfer5_piece_8 = extrude(amount=9, mode=Mode.PRIVATE)
    chamfer5_piece_8 = split(chamfer5_piece_8, bisect_by=Plane(origin=(-18.304496117, -9.96219574, -21.739598181), z_dir=(0, -0.6282346774929722, -0.7780239006581362)), keep=Keep.TOP, mode=Mode.PRIVATE)
    add(chamfer5_piece_8)

    # Fillet13
    # the kernel refuses this fillet: 1 mm, written as the material it adds along each edge
    with BuildSketch(Plane(origin=(16.9, -55.25867636, 14), x_dir=(0, 0, -1), z_dir=(0, 1, 0))) as fillet13_piece_1_section:
        with BuildLine():
            CenterArc((FILLET13_R * 0.414213562376, FILLET13_R), FILLET13_R, 225, 45)
            Line((-FILLET13_R * 0.292893218814, FILLET13_R * 0.292893218817), (0, 0))
            Line((0, 0), (FILLET13_R * 0.414213562376, 0))
        make_face()
    fillet13_piece_1 = extrude(amount=54.25867636, mode=Mode.PRIVATE)
    fillet13_piece_1 = split(fillet13_piece_1, bisect_by=Plane(origin=(16.837951776, -38.093007008, 0.97532244), z_dir=(0, 0.6282346774930556, 0.7780239006580688)), keep=Keep.TOP, mode=Mode.PRIVATE)
    add(fillet13_piece_1)
    with BuildSketch(Plane(origin=(14.9, -16.659367602, 16), x_dir=(0.7071067811898626, 0, -0.7071067811832326), z_dir=(0, 1, 0))) as fillet13_piece_2_section:
        with BuildLine():
            CenterArc((FILLET13_R * 0.41421356237, FILLET13_R), FILLET13_R, 225, 45)
            Line((-FILLET13_R * 0.292893218813, FILLET13_R * 0.29289321881), (0, 0))
            Line((0, 0), (FILLET13_R * 0.41421356237, 0))
        make_face()
    fillet13_piece_2 = extrude(amount=15.659367602, mode=Mode.PRIVATE)
    fillet13_piece_2 = fillet13_piece_2 - Plane(origin=(14.6, -17.5, 15.93807593), x_dir=(-1, 0, 0), z_dir=(0, 0, -1)) * Cylinder(1.9, 33, mode=Mode.PRIVATE)
    add(fillet13_piece_2)
    with BuildSketch(Plane(origin=(14.9, -56.5, 16), x_dir=(0.7071067811898647, 0, -0.7071067811832304), z_dir=(0, 1, 0))) as fillet13_piece_3_section:
        with BuildLine():
            CenterArc((FILLET13_R * 0.41421356237, FILLET13_R), FILLET13_R, 225, 45)
            Line((-FILLET13_R * 0.292893218813, FILLET13_R * 0.29289321881), (0, 0))
            Line((0, 0), (FILLET13_R * 0.41421356237, 0))
        make_face()
    fillet13_piece_3 = extrude(amount=3.159367602, mode=Mode.PRIVATE)
    fillet13_piece_3 = split(fillet13_piece_3, bisect_by=Plane(origin=(14.874971932, -55.902415279, 15.355970453), z_dir=(0, 0.6282346774930556, 0.7780239006580688)), keep=Keep.TOP, mode=Mode.PRIVATE)
    fillet13_piece_3 = fillet13_piece_3 - Plane(origin=(14.6, -52.5, 15.938106757), x_dir=(1, 0, 0), z_dir=(0, 0, -1)) * Cylinder(1.9, 8, mode=Mode.PRIVATE)
    add(fillet13_piece_3)
    with BuildSketch(Plane(origin=(-17.7, -53.340632398, 16), x_dir=(-0.7071067811862645, 0, -0.7071067811868306), z_dir=(0, -1, 0))) as fillet13_piece_4_section:
        with BuildLine():
            CenterArc((FILLET13_R * 0.414213562373, FILLET13_R), FILLET13_R, 225, 45)
            Line((-FILLET13_R * 0.292893218814, FILLET13_R * 0.292893218814), (0, 0))
            Line((0, 0), (FILLET13_R * 0.414213562373, 0))
        make_face()
    fillet13_piece_4 = extrude(amount=3.159367602, mode=Mode.PRIVATE)
    fillet13_piece_4 = fillet13_piece_4 - Plane(origin=(-17.4, -52.5, 15.938106777), x_dir=(-1, 0, 0), z_dir=(0, 0, -1)) * Cylinder(1.9, 8, mode=Mode.PRIVATE)
    fillet13_piece_4 = split(fillet13_piece_4, bisect_by=Plane(origin=(-17.674971948, -55.902415691, 15.355970786), z_dir=(0, 0.6282346774930556, 0.7780239006580688)), keep=Keep.TOP, mode=Mode.PRIVATE)
    add(fillet13_piece_4)
    with BuildSketch(Plane(origin=(-17.7, -1, 16), x_dir=(-0.7071067811862667, 0, -0.7071067811868285), z_dir=(0, -1, 0))) as fillet13_piece_5_section:
        with BuildLine():
            CenterArc((FILLET13_R * 0.414213562373, FILLET13_R), FILLET13_R, 225, 45)
            Line((-FILLET13_R * 0.292893218814, FILLET13_R * 0.292893218814), (0, 0))
            Line((0, 0), (FILLET13_R * 0.414213562373, 0))
        make_face()
    fillet13_piece_5 = extrude(amount=15.659367602, mode=Mode.PRIVATE)
    fillet13_piece_5 = fillet13_piece_5 - Plane(origin=(-17.4, -17.5, 15.938075915), x_dir=(1, 0, 0), z_dir=(0, 0, -1)) * Cylinder(1.9, 33, mode=Mode.PRIVATE)
    add(fillet13_piece_5)
    with BuildSketch(Plane(origin=(-19.7, -1, 14), x_dir=(0.7071067811862645, 0, 0.7071067811868306), z_dir=(0, -1, 0))) as fillet13_piece_6_section:
        with BuildLine():
            CenterArc((FILLET13_R * 0.414213562373, -FILLET13_R), FILLET13_R, 90, 45)
            Line((-FILLET13_R * 0.292893218813, -FILLET13_R * 0.292893218813), (0, 0))
            Line((0, 0), (FILLET13_R * 0.414213562373, 0))
        make_face()
    fillet13_piece_6 = extrude(amount=54.25867636, mode=Mode.PRIVATE)
    fillet13_piece_6 = split(fillet13_piece_6, bisect_by=Plane(origin=(-19.637951776, -38.093007007, 0.975322439), z_dir=(0, 0.6282346774930556, 0.7780239006580688)), keep=Keep.TOP, mode=Mode.PRIVATE)
    add(fillet13_piece_6)
    with BuildSketch(Plane(origin=(-17.7, -18.340632398, 16), x_dir=(-0.7071067811862645, 0, -0.7071067811868306), z_dir=(0, -1, 0))) as fillet13_piece_7_section:
        with BuildLine():
            CenterArc((FILLET13_R * 0.414213562373, FILLET13_R), FILLET13_R, 225, 45)
            Line((-FILLET13_R * 0.292893218814, FILLET13_R * 0.292893218814), (0, 0))
            Line((0, 0), (FILLET13_R * 0.414213562373, 0))
        make_face()
    fillet13_piece_7 = extrude(amount=33.318735204, mode=Mode.PRIVATE)
    fillet13_piece_7 = fillet13_piece_7 - Plane(origin=(-17.4, -52.5, 15.938083204), x_dir=(-1, 0, 0), z_dir=(0, 0, -1)) * Cylinder(1.9, 69, mode=Mode.PRIVATE)
    fillet13_piece_7 = fillet13_piece_7 - Plane(origin=(-17.4, -17.5, 15.938083204), x_dir=(1, 0, 0), z_dir=(0, 0, -1)) * Cylinder(1.9, 69, mode=Mode.PRIVATE)
    add(fillet13_piece_7)
    with BuildSketch(Plane(origin=(14.9, -51.659367602, 16), x_dir=(0.7071067811898626, 0, -0.7071067811832326), z_dir=(0, 1, 0))) as fillet13_piece_8_section:
        with BuildLine():
            CenterArc((FILLET13_R * 0.41421356237, FILLET13_R), FILLET13_R, 225, 45)
            Line((-FILLET13_R * 0.292893218813, FILLET13_R * 0.29289321881), (0, 0))
            Line((0, 0), (FILLET13_R * 0.41421356237, 0))
        make_face()
    fillet13_piece_8 = extrude(amount=33.318735204, mode=Mode.PRIVATE)
    fillet13_piece_8 = fillet13_piece_8 - Plane(origin=(14.6, -17.5, 15.938083204), x_dir=(-1, 0, 0), z_dir=(0, 0, -1)) * Cylinder(1.9, 69, mode=Mode.PRIVATE)
    fillet13_piece_8 = fillet13_piece_8 - Plane(origin=(14.6, -52.5, 15.938083204), x_dir=(1, 0, 0), z_dir=(0, 0, -1)) * Cylinder(1.9, 69, mode=Mode.PRIVATE)
    add(fillet13_piece_8)
    with BuildSketch(Plane(origin=(-19.7, -1, -19.711538462), x_dir=(0.7071067811862645, 0, -0.7071067811868306), z_dir=(0, -1, 0))) as fillet13_piece_9_section:
        with BuildLine():
            CenterArc((FILLET13_R * 0.414213562373, FILLET13_R), FILLET13_R, 225, 45)
            Line((-FILLET13_R * 0.292893218813, FILLET13_R * 0.292893218813), (0, 0))
            Line((0, 0), (FILLET13_R * 0.414213562373, 0))
        make_face()
    fillet13_piece_9 = extrude(amount=12.509337155, mode=Mode.PRIVATE)
    fillet13_piece_9 = split(fillet13_piece_9, bisect_by=Plane(origin=(-19.639290541, -9.02566381, -22.495824094), z_dir=(0, 0.6282346774930556, 0.7780239006580688)), keep=Keep.TOP, mode=Mode.PRIVATE)
    add(fillet13_piece_9)
    with BuildSketch(Plane(origin=(-17.7, -10, -21.711538462), x_dir=(-0.7071067811862645, 0, 0.7071067811868306), z_dir=(0, 1, 0))) as fillet13_piece_10_section:
        with BuildLine():
            CenterArc((FILLET13_R * 0.414213562373, FILLET13_R), FILLET13_R, 225, 45)
            Line((-FILLET13_R * 0.292893218814, FILLET13_R * 0.292893218814), (0, 0))
            Line((0, 0), (FILLET13_R * 0.414213562373, 0))
        make_face()
    fillet13_piece_10 = extrude(amount=9, mode=Mode.PRIVATE)
    fillet13_piece_10 = split(fillet13_piece_10, bisect_by=Plane(origin=(-17.501015195, -9.987109411, -21.71948102), z_dir=(0, -0.6282346774930556, -0.7780239006580688)), keep=Keep.TOP, mode=Mode.PRIVATE)
    add(fillet13_piece_10)
    with BuildSketch(Plane(origin=(-17.7, -11.035533906, -21.711538462), x_dir=(-0.7071067811862645, 0, 0.7071067811868306), z_dir=(0, 1, 0))) as fillet13_piece_11_section:
        with BuildLine():
            CenterArc((FILLET13_R * 0.414213562373, FILLET13_R), FILLET13_R, 225, 45)
            Line((-FILLET13_R * 0.292893218813, FILLET13_R * 0.292893218814), (0, 0))
            Line((0, 0), (FILLET13_R * 0.414213562373, 0))
        make_face()
    fillet13_piece_11 = extrude(amount=10.035533906, mode=Mode.PRIVATE)
    fillet13_piece_11 = split(fillet13_piece_11, bisect_by=Plane(origin=(-17.830954669, -10, -21.563659576), z_dir=(0, -1, 0)), keep=Keep.TOP, mode=Mode.PRIVATE)
    fillet13_piece_11 = split(fillet13_piece_11, bisect_by=Plane(origin=(-17.830954669, -10.125579091, -21.607670245), z_dir=(0, 0.6282346774930556, 0.7780239006580688)), keep=Keep.TOP, mode=Mode.PRIVATE)
    add(fillet13_piece_11)
    with BuildSketch(Plane(origin=(-17.7, -10, -21.711538462), x_dir=(-0.7071067811862645, 0, 0.7071067811868306), z_dir=(0, 1, 0))) as fillet13_piece_12_section:
        with BuildLine():
            CenterArc((FILLET13_R * 0.414213562373, FILLET13_R), FILLET13_R, 225, 45)
            Line((-FILLET13_R * 0.292893218814, FILLET13_R * 0.292893218814), (0, 0))
            Line((0, 0), (FILLET13_R * 0.414213562373, 0))
        make_face()
    fillet13_piece_12 = extrude(amount=9, mode=Mode.PRIVATE)
    fillet13_piece_12 = split(fillet13_piece_12, bisect_by=Plane(origin=(-17.674465043, -7.304014486, -23.886012503), z_dir=(0, 0.6282346774930556, 0.7780239006580688)), keep=Keep.TOP, mode=Mode.PRIVATE)
    add(fillet13_piece_12)
    with BuildSketch(Plane(origin=(16.9, -13.509337155, -19.711538462), x_dir=(-0.7071067811862645, 0, -0.7071067811868306), z_dir=(0, 1, 0))) as fillet13_piece_13_section:
        with BuildLine():
            CenterArc((FILLET13_R * 0.414213562373, FILLET13_R), FILLET13_R, 225, 45)
            Line((-FILLET13_R * 0.292893218813, FILLET13_R * 0.292893218813), (0, 0))
            Line((0, 0), (FILLET13_R * 0.414213562373, 0))
        make_face()
    fillet13_piece_13 = extrude(amount=12.509337155, mode=Mode.PRIVATE)
    fillet13_piece_13 = split(fillet13_piece_13, bisect_by=Plane(origin=(16.839290541, -9.02566381, -22.495824094), z_dir=(0, 0.6282346774930556, 0.7780239006580688)), keep=Keep.TOP, mode=Mode.PRIVATE)
    add(fillet13_piece_13)
    with BuildSketch(Plane(origin=(14.9, -1, -21.711538462), x_dir=(-1, 0, 0), z_dir=(0, -1, 0))) as fillet13_piece_14_section:
        with BuildLine():
            CenterArc((FILLET13_R * 0.414213562374, -FILLET13_R), FILLET13_R, 90, 45)
            Line((-FILLET13_R * 0.292893218813, -FILLET13_R * 0.292893218814), (0, 0))
            Line((0, 0), (FILLET13_R * 0.414213562373, 0))
        make_face()
    fillet13_piece_14 = extrude(amount=9, mode=Mode.PRIVATE)
    fillet13_piece_14 = split(fillet13_piece_14, bisect_by=Plane(origin=(14.874465043, -7.304014485, -23.886012503), z_dir=(0, 0.6282346774930556, 0.7780239006580688)), keep=Keep.TOP, mode=Mode.PRIVATE)
    add(fillet13_piece_14)
    with BuildSketch(Plane(origin=(14.9, -1, -21.711538462), x_dir=(-1, 0, 0), z_dir=(0, -1, 0))) as fillet13_piece_15_section:
        with BuildLine():
            CenterArc((FILLET13_R * 0.414213562374, -FILLET13_R), FILLET13_R, 90, 45)
            Line((-FILLET13_R * 0.292893218813, -FILLET13_R * 0.292893218814), (0, 0))
            Line((0, 0), (FILLET13_R * 0.414213562373, 0))
        make_face()
    fillet13_piece_15 = extrude(amount=10.035533906, mode=Mode.PRIVATE)
    fillet13_piece_15 = split(fillet13_piece_15, bisect_by=Plane(origin=(15.030954665, -10, -21.563659577), z_dir=(0, -1, 0)), keep=Keep.TOP, mode=Mode.PRIVATE)
    fillet13_piece_15 = split(fillet13_piece_15, bisect_by=Plane(origin=(15.030954665, -10.12557909, -21.607670246), z_dir=(0, 0.6282346774930556, 0.7780239006580688)), keep=Keep.TOP, mode=Mode.PRIVATE)
    add(fillet13_piece_15)
    with BuildSketch(Plane(origin=(14.9, -1, -21.711538462), x_dir=(-1, 0, 0), z_dir=(0, -1, 0))) as fillet13_piece_16_section:
        with BuildLine():
            CenterArc((FILLET13_R * 0.414213562374, -FILLET13_R), FILLET13_R, 90, 45)
            Line((-FILLET13_R * 0.292893218813, -FILLET13_R * 0.292893218814), (0, 0))
            Line((0, 0), (FILLET13_R * 0.414213562373, 0))
        make_face()
    fillet13_piece_16 = extrude(amount=9, mode=Mode.PRIVATE)
    fillet13_piece_16 = split(fillet13_piece_16, bisect_by=Plane(origin=(14.701015196, -9.987109411, -21.71948102), z_dir=(0, -0.6282346774930556, -0.7780239006580688)), keep=Keep.TOP, mode=Mode.PRIVATE)
    add(fillet13_piece_16)


solid = part_1.part
